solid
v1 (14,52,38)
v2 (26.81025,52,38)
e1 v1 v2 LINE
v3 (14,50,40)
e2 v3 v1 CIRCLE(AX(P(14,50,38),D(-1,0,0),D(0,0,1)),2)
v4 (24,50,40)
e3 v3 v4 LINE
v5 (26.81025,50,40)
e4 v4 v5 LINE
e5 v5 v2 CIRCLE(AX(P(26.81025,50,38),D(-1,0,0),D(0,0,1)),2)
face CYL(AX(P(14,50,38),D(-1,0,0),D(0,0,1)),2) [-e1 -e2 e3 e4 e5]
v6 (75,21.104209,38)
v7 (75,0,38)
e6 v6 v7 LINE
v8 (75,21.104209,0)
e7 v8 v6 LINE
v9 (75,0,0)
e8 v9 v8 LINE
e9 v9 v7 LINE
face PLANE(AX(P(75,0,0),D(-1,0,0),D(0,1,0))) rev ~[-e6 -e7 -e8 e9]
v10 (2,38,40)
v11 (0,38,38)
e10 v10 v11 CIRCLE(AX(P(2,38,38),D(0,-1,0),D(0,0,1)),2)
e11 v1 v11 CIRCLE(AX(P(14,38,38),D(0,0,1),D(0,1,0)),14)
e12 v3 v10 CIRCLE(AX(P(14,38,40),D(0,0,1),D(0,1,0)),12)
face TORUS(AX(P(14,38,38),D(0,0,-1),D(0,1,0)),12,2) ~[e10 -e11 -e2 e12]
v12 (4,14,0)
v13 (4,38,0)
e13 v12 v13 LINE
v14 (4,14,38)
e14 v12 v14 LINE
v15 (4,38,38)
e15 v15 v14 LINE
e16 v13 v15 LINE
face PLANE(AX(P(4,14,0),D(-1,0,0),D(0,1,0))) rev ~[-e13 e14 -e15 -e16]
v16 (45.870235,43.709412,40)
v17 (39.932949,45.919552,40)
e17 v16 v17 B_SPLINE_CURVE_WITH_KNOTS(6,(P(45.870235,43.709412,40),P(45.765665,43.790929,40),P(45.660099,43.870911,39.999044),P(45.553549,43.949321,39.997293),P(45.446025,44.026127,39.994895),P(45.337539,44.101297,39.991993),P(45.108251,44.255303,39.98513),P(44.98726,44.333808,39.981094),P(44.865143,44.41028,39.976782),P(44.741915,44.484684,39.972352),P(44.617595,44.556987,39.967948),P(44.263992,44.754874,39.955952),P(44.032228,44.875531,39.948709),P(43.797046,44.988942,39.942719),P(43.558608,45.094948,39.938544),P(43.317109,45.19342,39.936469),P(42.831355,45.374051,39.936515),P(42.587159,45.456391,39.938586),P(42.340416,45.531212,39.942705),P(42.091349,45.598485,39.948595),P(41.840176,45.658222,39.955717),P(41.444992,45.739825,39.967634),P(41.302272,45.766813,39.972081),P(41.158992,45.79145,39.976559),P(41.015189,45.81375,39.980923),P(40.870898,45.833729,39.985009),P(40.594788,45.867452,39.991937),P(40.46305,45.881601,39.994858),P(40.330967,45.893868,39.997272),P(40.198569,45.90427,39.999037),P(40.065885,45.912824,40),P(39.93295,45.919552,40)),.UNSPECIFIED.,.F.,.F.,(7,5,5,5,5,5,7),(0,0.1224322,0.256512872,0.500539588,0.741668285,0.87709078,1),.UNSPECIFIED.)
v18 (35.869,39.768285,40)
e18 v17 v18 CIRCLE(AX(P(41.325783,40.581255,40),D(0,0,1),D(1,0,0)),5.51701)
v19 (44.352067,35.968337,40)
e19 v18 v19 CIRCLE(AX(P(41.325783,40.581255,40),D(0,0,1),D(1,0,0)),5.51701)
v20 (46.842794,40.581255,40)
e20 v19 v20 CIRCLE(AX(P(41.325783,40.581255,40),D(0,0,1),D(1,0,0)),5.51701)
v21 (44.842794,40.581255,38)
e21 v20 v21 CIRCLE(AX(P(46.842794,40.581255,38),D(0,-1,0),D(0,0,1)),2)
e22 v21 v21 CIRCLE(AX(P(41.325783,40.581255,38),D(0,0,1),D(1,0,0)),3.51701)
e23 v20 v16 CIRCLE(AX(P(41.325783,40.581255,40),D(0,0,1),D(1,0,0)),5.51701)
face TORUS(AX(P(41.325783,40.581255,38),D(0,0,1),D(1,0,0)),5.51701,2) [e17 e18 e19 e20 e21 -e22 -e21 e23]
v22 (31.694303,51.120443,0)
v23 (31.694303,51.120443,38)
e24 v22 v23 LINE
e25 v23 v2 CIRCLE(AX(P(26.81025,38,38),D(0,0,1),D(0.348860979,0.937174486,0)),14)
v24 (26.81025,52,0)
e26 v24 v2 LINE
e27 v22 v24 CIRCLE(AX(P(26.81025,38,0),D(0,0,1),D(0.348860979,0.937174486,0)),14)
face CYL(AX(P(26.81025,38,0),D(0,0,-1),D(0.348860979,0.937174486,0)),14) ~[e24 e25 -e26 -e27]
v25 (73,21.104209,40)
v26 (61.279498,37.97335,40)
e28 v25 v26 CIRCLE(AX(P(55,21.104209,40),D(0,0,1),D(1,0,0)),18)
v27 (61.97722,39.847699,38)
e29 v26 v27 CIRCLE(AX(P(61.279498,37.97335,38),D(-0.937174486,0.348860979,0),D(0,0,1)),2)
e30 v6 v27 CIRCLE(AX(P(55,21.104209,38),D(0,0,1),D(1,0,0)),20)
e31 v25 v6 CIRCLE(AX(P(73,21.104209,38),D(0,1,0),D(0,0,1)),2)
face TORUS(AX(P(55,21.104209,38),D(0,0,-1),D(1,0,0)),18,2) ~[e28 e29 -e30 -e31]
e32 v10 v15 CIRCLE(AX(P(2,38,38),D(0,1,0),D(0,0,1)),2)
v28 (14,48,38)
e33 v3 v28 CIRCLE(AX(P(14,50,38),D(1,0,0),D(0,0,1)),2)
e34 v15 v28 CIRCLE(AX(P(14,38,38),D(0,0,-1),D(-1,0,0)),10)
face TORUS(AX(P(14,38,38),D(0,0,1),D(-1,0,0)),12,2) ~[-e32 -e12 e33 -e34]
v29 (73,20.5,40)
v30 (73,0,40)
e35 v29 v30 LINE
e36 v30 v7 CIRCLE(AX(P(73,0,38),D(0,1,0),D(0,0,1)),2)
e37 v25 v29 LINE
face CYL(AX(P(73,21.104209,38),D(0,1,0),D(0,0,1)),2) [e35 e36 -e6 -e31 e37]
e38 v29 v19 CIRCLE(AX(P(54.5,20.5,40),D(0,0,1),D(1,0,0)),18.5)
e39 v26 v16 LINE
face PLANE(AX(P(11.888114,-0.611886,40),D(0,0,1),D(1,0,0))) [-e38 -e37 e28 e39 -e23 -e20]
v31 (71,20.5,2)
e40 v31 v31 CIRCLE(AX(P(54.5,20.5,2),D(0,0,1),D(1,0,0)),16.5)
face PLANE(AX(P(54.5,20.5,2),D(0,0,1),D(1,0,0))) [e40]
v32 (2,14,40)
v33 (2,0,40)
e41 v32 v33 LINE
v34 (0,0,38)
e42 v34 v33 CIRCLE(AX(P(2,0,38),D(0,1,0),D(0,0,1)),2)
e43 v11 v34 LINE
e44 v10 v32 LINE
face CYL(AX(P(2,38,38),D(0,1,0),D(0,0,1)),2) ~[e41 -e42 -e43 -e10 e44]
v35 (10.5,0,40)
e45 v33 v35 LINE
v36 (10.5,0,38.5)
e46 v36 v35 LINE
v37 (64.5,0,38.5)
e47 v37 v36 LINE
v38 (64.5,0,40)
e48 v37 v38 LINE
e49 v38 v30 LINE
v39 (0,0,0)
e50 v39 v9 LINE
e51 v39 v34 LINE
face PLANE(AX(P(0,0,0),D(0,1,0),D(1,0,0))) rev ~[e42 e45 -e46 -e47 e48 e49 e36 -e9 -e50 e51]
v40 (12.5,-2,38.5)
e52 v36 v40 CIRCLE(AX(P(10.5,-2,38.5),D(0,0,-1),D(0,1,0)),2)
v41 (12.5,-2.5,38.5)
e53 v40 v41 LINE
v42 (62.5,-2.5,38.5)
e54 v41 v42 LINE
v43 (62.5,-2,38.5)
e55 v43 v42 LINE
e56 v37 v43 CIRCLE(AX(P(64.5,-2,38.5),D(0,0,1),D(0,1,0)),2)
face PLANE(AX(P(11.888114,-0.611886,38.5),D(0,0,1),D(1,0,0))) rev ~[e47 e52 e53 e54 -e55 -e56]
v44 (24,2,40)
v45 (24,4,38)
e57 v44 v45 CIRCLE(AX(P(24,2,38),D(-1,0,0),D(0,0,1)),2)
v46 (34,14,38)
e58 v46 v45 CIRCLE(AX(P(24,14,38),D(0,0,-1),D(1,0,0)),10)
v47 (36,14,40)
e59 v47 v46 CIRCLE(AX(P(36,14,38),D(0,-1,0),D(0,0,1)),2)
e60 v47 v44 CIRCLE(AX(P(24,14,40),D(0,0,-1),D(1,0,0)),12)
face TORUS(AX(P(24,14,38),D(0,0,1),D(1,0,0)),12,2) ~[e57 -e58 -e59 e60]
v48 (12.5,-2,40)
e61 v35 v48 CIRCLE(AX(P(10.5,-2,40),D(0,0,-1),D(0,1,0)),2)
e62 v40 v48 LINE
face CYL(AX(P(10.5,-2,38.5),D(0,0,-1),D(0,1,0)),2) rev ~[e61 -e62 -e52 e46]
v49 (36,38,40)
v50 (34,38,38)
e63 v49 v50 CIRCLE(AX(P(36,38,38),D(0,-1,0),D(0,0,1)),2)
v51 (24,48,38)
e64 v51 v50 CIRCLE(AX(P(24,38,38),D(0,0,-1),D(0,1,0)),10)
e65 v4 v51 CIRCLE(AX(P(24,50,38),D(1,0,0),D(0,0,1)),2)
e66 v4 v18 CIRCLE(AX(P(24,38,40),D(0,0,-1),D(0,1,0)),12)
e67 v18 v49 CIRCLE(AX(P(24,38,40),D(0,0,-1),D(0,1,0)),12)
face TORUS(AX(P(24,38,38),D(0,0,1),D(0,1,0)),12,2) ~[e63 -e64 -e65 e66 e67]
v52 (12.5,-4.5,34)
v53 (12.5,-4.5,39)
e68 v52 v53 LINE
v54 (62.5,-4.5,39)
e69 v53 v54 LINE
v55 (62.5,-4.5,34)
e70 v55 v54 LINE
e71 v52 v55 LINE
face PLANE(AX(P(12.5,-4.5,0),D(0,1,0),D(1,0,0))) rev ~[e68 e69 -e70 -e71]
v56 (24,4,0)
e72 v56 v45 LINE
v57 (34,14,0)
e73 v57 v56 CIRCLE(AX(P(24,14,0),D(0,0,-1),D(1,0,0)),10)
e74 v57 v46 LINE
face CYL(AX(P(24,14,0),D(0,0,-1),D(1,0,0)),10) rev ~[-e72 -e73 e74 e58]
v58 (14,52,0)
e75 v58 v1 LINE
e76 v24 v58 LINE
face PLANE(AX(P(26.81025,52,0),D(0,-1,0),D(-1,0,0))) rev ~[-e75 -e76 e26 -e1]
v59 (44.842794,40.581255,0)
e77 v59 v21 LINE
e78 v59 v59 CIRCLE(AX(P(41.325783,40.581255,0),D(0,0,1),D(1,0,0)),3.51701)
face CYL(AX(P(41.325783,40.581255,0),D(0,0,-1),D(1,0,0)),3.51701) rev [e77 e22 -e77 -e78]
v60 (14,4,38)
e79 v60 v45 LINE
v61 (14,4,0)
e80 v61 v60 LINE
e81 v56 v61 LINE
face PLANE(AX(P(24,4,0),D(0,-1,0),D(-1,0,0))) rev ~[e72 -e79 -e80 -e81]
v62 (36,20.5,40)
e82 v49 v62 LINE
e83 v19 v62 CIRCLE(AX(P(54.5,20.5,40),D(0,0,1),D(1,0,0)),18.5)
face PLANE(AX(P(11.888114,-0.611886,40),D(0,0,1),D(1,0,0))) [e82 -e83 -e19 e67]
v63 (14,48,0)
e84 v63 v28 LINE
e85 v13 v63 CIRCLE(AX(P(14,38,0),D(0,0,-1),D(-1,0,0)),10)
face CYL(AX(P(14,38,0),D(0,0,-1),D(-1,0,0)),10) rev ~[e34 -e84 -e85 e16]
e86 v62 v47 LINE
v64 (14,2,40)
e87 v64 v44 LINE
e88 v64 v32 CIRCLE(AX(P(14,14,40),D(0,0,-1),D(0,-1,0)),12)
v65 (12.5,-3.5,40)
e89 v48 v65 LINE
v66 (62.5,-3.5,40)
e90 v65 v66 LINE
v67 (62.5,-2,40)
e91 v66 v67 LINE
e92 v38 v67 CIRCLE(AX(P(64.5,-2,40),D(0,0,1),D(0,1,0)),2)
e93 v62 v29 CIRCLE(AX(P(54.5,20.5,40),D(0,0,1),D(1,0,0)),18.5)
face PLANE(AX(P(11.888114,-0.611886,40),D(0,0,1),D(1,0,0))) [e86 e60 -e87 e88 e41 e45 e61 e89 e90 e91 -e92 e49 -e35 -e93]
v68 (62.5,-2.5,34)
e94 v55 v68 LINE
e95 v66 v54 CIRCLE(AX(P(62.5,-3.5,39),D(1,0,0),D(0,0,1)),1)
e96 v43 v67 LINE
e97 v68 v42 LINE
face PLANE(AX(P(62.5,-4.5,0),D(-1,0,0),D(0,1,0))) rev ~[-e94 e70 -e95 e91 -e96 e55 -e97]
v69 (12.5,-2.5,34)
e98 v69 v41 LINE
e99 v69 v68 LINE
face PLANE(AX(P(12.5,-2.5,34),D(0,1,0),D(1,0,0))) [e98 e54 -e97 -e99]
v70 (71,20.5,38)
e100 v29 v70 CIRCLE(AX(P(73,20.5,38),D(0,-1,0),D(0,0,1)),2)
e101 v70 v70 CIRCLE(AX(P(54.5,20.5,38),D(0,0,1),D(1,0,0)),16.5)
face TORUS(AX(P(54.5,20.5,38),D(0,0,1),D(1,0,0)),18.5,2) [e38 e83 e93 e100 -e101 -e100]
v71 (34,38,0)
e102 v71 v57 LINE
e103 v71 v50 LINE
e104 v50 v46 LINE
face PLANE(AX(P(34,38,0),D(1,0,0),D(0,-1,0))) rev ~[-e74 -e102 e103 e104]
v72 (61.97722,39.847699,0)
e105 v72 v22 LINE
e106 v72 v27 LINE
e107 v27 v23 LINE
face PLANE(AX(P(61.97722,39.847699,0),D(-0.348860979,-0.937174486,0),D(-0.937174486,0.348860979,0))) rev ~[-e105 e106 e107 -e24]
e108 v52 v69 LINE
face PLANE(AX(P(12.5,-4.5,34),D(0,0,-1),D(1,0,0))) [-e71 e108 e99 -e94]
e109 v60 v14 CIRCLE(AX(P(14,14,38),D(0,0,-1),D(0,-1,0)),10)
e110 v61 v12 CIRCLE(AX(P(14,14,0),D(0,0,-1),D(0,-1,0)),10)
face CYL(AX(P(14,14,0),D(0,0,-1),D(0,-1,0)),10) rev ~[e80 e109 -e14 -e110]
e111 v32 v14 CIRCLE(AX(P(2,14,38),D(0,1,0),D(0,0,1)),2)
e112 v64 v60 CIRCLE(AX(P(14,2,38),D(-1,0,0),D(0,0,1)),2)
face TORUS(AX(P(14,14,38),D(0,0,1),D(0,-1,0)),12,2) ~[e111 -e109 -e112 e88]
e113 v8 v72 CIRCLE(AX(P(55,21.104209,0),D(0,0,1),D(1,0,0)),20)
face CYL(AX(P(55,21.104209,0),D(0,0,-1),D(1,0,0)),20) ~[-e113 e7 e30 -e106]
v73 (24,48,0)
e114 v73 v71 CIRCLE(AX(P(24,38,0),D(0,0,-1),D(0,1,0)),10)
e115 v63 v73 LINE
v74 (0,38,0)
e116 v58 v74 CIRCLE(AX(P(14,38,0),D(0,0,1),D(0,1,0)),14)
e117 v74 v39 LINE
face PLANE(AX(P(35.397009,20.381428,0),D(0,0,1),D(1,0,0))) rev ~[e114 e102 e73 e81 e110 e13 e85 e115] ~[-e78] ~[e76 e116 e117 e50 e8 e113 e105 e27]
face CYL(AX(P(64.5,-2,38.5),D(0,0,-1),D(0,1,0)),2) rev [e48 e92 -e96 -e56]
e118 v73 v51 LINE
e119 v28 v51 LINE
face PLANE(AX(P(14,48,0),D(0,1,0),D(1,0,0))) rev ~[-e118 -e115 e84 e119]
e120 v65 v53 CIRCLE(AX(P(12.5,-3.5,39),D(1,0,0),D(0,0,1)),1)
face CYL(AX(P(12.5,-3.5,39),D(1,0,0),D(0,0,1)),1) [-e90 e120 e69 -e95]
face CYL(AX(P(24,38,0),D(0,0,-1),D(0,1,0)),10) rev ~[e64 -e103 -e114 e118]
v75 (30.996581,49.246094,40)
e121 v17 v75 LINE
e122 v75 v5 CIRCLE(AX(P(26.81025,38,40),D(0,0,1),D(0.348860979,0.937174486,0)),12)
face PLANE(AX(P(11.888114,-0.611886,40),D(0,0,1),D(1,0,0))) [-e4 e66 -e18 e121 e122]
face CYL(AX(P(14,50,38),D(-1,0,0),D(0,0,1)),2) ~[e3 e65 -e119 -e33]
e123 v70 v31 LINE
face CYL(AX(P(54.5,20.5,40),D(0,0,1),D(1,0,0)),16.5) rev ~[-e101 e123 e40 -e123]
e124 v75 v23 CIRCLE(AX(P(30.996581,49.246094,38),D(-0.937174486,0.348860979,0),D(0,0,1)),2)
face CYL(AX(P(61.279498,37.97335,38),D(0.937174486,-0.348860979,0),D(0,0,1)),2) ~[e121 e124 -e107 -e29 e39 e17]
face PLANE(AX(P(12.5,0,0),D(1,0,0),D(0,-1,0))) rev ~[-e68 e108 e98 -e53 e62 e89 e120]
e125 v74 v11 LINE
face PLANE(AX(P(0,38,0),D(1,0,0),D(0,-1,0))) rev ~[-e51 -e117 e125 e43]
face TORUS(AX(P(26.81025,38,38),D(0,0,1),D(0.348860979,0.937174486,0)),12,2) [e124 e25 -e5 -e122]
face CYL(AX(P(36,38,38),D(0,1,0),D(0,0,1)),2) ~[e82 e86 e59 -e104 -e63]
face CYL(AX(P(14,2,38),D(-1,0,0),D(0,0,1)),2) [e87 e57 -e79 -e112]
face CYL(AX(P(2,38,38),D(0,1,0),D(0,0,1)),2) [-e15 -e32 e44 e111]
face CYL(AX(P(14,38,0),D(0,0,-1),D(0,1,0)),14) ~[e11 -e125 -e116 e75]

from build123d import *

# Parameters (mm, degrees)
F0_R         = 16.5
F0_R_2       = 3.5170103203
F1_DEPTH     = 40
F2_R         = 16.5
F3_DEPTH     = 38
F4_W         = 50
F4_H         = 34
F5_DEPTH     = 4.5
F6_W         = 50
F6_H         = 2.5
F7_DEPTH     = 4.5
F8_T1_DEPTH  = 1.5
F8_T3_DEPTH  = 24
F8_T5_DEPTH  = 32.3129968036
F8_T7_DEPTH  = 12.8102496977
F8_T9_DEPTH  = 43
F8_T11_DEPTH = 26.1042093904
F8_T13_DEPTH = 10
F8_T20_ANGLE = 69.5823366889
F8_T22_ANGLE = 20.4176633111
F8_T24_ANGLE = 90
F8_T26_ANGLE = 90
F8_T28_ANGLE = 90
F8_T30_ANGLE = 90
F8_T32_ANGLE = 90
F9_R         = 1


# Not quite as in the source:
# - a fillet or chamfer that OpenCascade refuses, or shapes differently, is made with other operations: its cross-section is extruded or revolved along the edge and cut away or added


with BuildPart() as f1:
    # F0 (on Top) → F1 (new body)
    with BuildSketch(Plane.XY):
        with BuildLine():
            Line((0, 38), (0, 0))
            Line((0, 0), (12.5, 0))
            Line((12.5, 0), (12.5, -4.5))
            Line((12.5, -4.5), (62.5, -4.5))
            Line((62.5, -4.5), (62.5, 0))
            Line((62.5, 0), (75, 0))
            Line((75, 0), (75, 21.1042093904))
            ThreePointArc((75, 21.1042093904), (71.4247434001, 32.5159491456), (61.9772195759, 39.8476991132))
            Line((61.9772195759, 39.8476991132), (31.6943034009, 51.120442806))
            ThreePointArc((31.6943034009, 51.120442806), (29.2915599077, 51.7783562025), (26.8102496977, 52))
            Line((26.8102496977, 52), (14, 52))
            ThreePointArc((14, 52), (4.1005050634, 47.8994949366), (0, 38))
        make_face()
        with Locations((54.5, 20.5)):
            Circle(F0_R, mode=Mode.SUBTRACT)
        with BuildLine():
            ThreePointArc((4, 38), (6.9289321881, 45.0710678119), (14, 48))
            Line((14, 48), (24, 48))
            ThreePointArc((24, 48), (31.0710678119, 45.0710678119), (34, 38))
            Line((34, 38), (34, 14))
            ThreePointArc((34, 14), (31.0710678119, 6.9289321881), (24, 4))
            Line((24, 4), (14, 4))
            ThreePointArc((14, 4), (6.9289321881, 6.9289321881), (4, 14))
            Line((4, 14), (4, 38))
        make_face(mode=Mode.SUBTRACT)
        with Locations((41.3257834749, 40.5812550323)):
            Circle(F0_R_2, mode=Mode.SUBTRACT)
        with Locations((54.5, 20.5)):
            Circle(F0_R)
    extrude(amount=F1_DEPTH)

    # F2 (on face) → F3 (cut)
    with BuildSketch(Plane.XY.offset(40)):
        with Locations((54.5, 20.5)):
            Circle(F2_R)
    extrude(amount=-F3_DEPTH, mode=Mode.SUBTRACT)

    # F4 (on face) → F5 (cut)
    with BuildSketch(Plane.XZ.offset(4.5)):
        with Locations((37.5, 17)):
            Rectangle(F4_W, F4_H)
    extrude(amount=-F5_DEPTH, mode=Mode.SUBTRACT)

    # F6 (on face) → F7 (cut)
    with BuildSketch(Plane(origin=(0, 0, 34), x_dir=(1, 0, 0), z_dir=(0, 0, -1))):
        with Locations((37.5, 1.25)):
            Rectangle(F6_W, F6_H)
    extrude(amount=-F7_DEPTH, mode=Mode.SUBTRACT)

    # F8: fillet of radius 2 on 6 edges, made by hand

    # F8_s2 → F8_t1 (join)
    with BuildSketch(Plane.XY.offset(38.5)):
        with BuildLine():
            ThreePointArc((10.5, 0), (11.9142135624, -0.5857864376), (12.5, -2))
            Line((12.5, -2), (12.5, 0))
            Line((12.5, 0), (10.5, 0))
        make_face()
        with BuildLine():
            ThreePointArc((64.5, 0), (63.0857864376, -0.5857864376), (62.5, -2))
            Line((62.5, -2), (62.5, 0))
            Line((62.5, 0), (64.5, 0))
        make_face()
    extrude(amount=F8_T1_DEPTH)

    # F8_s4 → F8_t3 (cut)
    with BuildSketch(Plane.XZ.offset(-38)):
        with BuildLine():
            ThreePointArc((36, 40), (34.5857864376, 39.4142135624), (34, 38))
            Line((34, 38), (34, 40))
            Line((34, 40), (36, 40))
        make_face()
        with BuildLine():
            ThreePointArc((2, 40), (3.4142135624, 39.4142135624), (4, 38))
            Line((4, 38), (4, 40))
            Line((4, 40), (2, 40))
        make_face()
    extrude(amount=F8_T3_DEPTH, mode=Mode.SUBTRACT)

    # F8_s6 → F8_t5 (cut)
    with BuildSketch(Plane(origin=(41.4063945876, -15.4134321387, 0), x_dir=(0, 0, 1), z_dir=(-0.9371744861, 0.3488609788, 0))):
        with BuildLine():
            ThreePointArc((40, 56.9656804247), (39.4142135624, 58.3798939871), (38, 58.9656804247))
            Line((38, 58.9656804247), (40, 58.9656804247))
            Line((40, 58.9656804247), (40, 56.9656804247))
        make_face()
    extrude(amount=F8_T5_DEPTH, mode=Mode.SUBTRACT)

    # F8_s8 → F8_t7 (cut)
    with BuildSketch(Plane.YZ.offset(14)):
        with BuildLine():
            ThreePointArc((50, 40), (51.4142135624, 39.4142135624), (52, 38))
            Line((52, 38), (52, 40))
            Line((52, 40), (50, 40))
        make_face()
    extrude(amount=F8_T7_DEPTH, mode=Mode.SUBTRACT)

    # F8_s10 → F8_t9 (cut)
    with BuildSketch(Plane.XZ.offset(-38)):
        with BuildLine():
            ThreePointArc((2, 40), (0.5857864376, 39.4142135624), (0, 38))
            Line((0, 38), (0, 40))
            Line((0, 40), (2, 40))
        make_face()
    extrude(amount=F8_T9_DEPTH, mode=Mode.SUBTRACT)

    # F8_s12 → F8_t11 (cut)
    with BuildSketch(Plane.XZ.offset(-21.1042093904)):
        with BuildLine():
            ThreePointArc((73, 40), (74.4142135624, 39.4142135624), (75, 38))
            Line((75, 38), (75, 40))
            Line((75, 40), (73, 40))
        make_face()
    extrude(amount=F8_T11_DEPTH, mode=Mode.SUBTRACT)

    # F8_s14 → F8_t13 (cut)
    with BuildSketch(Plane.YZ.offset(14)):
        with BuildLine():
            ThreePointArc((2, 40), (3.4142135624, 39.4142135624), (4, 38))
            Line((4, 38), (4, 40))
            Line((4, 40), (2, 40))
        make_face()
        with BuildLine():
            ThreePointArc((50, 40), (48.5857864376, 39.4142135624), (48, 38))
            Line((48, 38), (48, 40))
            Line((48, 40), (50, 40))
        make_face()
    extrude(amount=F8_T13_DEPTH, mode=Mode.SUBTRACT)

    # F8_s15 → F8_t16 (revolve, cut)
    with BuildSketch(Plane.XZ.offset(-20.5)):
        with BuildLine():
            ThreePointArc((73, 40), (71.5857864376, 39.4142135624), (71, 38))
            Line((71, 38), (71, 40))
            Line((71, 40), (73, 40))
        make_face()
    revolve(axis=Axis((54.5, 20.5, 40), (0, 0, 1)), mode=Mode.SUBTRACT)

    # F8_s17 → F8_t18 (revolve, cut)
    with BuildSketch(Plane.XZ.offset(-40.5812550323)):
        with BuildLine():
            ThreePointArc((46.8427937951, 40), (45.4285802328, 39.4142135624), (44.8427937951, 38))
            Line((44.8427937951, 38), (44.8427937951, 40))
            Line((44.8427937951, 40), (46.8427937951, 40))
        make_face()
    revolve(axis=Axis((41.3257834749, 40.5812550323, 40), (0, 0, 1)), mode=Mode.SUBTRACT)

    # F8_s19 → F8_t20 (revolve, cut)
    with BuildSketch(Plane.XZ.offset(-21.1042093904)):
        with BuildLine():
            ThreePointArc((73, 40), (74.4142135624, 39.4142135624), (75, 38))
            Line((75, 38), (75, 40))
            Line((75, 40), (73, 40))
        make_face()
    revolve(axis=Axis((55, 21.1042093904, 40), (0, 0, 1)), revolution_arc=F8_T20_ANGLE, mode=Mode.SUBTRACT)

    # F8_s21 → F8_t22 (revolve, cut)
    with BuildSketch(Plane(origin=(11.1234784125, -4.140688446, 0), x_dir=(0, 0, 1), z_dir=(0.9371744861, -0.3488609788, 0))):
        with BuildLine():
            ThreePointArc((38, -58.9656804247), (39.4142135624, -58.3798939871), (40, -56.9656804247))
            Line((40, -56.9656804247), (40, -58.9656804247))
            Line((40, -58.9656804247), (38, -58.9656804247))
        make_face()
    revolve(axis=Axis((26.8102496977, 38, 40), (0, 0, 1)), revolution_arc=F8_T22_ANGLE, mode=Mode.SUBTRACT)

    # F8_s23 → F8_t24 (revolve, cut)
    with BuildSketch(Plane.YZ.offset(14)):
        with BuildLine():
            ThreePointArc((50, 40), (51.4142135624, 39.4142135624), (52, 38))
            Line((52, 38), (52, 40))
            Line((52, 40), (50, 40))
        make_face()
    revolve(axis=Axis((14, 38, 40), (0, 0, 1)), revolution_arc=F8_T24_ANGLE, mode=Mode.SUBTRACT)

    # F8_s25 → F8_t26 (revolve, cut)
    with BuildSketch(Plane.YZ.offset(24)):
        with BuildLine():
            ThreePointArc((50, 40), (48.5857864376, 39.4142135624), (48, 38))
            Line((48, 38), (48, 40))
            Line((48, 40), (50, 40))
        make_face()
    revolve(axis=Axis((24, 38, 40), (0, 0, -1)), revolution_arc=F8_T26_ANGLE, mode=Mode.SUBTRACT)

    # F8_s27 → F8_t28 (revolve, cut)
    with BuildSketch(Plane.XZ.offset(-14)):
        with BuildLine():
            ThreePointArc((36, 40), (34.5857864376, 39.4142135624), (34, 38))
            Line((34, 38), (34, 40))
            Line((34, 40), (36, 40))
        make_face()
    revolve(axis=Axis((24, 14, 40), (0, 0, -1)), revolution_arc=F8_T28_ANGLE, mode=Mode.SUBTRACT)

    # F8_s29 → F8_t30 (revolve, cut)
    with BuildSketch(Plane.YZ.offset(14)):
        with BuildLine():
            ThreePointArc((2, 40), (3.4142135624, 39.4142135624), (4, 38))
            Line((4, 38), (4, 40))
            Line((4, 40), (2, 40))
        make_face()
    revolve(axis=Axis((14, 14, 40), (0, 0, -1)), revolution_arc=F8_T30_ANGLE, mode=Mode.SUBTRACT)

    # F8_s31 → F8_t32 (revolve, cut)
    with BuildSketch(Plane.XZ.offset(-38)):
        with BuildLine():
            ThreePointArc((2, 40), (3.4142135624, 39.4142135624), (4, 38))
            Line((4, 38), (4, 40))
            Line((4, 40), (2, 40))
        make_face()
    revolve(axis=Axis((14, 38, 40), (0, 0, -1)), revolution_arc=F8_T32_ANGLE, mode=Mode.SUBTRACT)

    # F9
    f9_edges = [f1.edges().sort_by_distance(p)[0] for p in [
        (37.5, -4.5, 40),
    ]]
    fillet(f9_edges, radius=F9_R)


solid = f1.part
